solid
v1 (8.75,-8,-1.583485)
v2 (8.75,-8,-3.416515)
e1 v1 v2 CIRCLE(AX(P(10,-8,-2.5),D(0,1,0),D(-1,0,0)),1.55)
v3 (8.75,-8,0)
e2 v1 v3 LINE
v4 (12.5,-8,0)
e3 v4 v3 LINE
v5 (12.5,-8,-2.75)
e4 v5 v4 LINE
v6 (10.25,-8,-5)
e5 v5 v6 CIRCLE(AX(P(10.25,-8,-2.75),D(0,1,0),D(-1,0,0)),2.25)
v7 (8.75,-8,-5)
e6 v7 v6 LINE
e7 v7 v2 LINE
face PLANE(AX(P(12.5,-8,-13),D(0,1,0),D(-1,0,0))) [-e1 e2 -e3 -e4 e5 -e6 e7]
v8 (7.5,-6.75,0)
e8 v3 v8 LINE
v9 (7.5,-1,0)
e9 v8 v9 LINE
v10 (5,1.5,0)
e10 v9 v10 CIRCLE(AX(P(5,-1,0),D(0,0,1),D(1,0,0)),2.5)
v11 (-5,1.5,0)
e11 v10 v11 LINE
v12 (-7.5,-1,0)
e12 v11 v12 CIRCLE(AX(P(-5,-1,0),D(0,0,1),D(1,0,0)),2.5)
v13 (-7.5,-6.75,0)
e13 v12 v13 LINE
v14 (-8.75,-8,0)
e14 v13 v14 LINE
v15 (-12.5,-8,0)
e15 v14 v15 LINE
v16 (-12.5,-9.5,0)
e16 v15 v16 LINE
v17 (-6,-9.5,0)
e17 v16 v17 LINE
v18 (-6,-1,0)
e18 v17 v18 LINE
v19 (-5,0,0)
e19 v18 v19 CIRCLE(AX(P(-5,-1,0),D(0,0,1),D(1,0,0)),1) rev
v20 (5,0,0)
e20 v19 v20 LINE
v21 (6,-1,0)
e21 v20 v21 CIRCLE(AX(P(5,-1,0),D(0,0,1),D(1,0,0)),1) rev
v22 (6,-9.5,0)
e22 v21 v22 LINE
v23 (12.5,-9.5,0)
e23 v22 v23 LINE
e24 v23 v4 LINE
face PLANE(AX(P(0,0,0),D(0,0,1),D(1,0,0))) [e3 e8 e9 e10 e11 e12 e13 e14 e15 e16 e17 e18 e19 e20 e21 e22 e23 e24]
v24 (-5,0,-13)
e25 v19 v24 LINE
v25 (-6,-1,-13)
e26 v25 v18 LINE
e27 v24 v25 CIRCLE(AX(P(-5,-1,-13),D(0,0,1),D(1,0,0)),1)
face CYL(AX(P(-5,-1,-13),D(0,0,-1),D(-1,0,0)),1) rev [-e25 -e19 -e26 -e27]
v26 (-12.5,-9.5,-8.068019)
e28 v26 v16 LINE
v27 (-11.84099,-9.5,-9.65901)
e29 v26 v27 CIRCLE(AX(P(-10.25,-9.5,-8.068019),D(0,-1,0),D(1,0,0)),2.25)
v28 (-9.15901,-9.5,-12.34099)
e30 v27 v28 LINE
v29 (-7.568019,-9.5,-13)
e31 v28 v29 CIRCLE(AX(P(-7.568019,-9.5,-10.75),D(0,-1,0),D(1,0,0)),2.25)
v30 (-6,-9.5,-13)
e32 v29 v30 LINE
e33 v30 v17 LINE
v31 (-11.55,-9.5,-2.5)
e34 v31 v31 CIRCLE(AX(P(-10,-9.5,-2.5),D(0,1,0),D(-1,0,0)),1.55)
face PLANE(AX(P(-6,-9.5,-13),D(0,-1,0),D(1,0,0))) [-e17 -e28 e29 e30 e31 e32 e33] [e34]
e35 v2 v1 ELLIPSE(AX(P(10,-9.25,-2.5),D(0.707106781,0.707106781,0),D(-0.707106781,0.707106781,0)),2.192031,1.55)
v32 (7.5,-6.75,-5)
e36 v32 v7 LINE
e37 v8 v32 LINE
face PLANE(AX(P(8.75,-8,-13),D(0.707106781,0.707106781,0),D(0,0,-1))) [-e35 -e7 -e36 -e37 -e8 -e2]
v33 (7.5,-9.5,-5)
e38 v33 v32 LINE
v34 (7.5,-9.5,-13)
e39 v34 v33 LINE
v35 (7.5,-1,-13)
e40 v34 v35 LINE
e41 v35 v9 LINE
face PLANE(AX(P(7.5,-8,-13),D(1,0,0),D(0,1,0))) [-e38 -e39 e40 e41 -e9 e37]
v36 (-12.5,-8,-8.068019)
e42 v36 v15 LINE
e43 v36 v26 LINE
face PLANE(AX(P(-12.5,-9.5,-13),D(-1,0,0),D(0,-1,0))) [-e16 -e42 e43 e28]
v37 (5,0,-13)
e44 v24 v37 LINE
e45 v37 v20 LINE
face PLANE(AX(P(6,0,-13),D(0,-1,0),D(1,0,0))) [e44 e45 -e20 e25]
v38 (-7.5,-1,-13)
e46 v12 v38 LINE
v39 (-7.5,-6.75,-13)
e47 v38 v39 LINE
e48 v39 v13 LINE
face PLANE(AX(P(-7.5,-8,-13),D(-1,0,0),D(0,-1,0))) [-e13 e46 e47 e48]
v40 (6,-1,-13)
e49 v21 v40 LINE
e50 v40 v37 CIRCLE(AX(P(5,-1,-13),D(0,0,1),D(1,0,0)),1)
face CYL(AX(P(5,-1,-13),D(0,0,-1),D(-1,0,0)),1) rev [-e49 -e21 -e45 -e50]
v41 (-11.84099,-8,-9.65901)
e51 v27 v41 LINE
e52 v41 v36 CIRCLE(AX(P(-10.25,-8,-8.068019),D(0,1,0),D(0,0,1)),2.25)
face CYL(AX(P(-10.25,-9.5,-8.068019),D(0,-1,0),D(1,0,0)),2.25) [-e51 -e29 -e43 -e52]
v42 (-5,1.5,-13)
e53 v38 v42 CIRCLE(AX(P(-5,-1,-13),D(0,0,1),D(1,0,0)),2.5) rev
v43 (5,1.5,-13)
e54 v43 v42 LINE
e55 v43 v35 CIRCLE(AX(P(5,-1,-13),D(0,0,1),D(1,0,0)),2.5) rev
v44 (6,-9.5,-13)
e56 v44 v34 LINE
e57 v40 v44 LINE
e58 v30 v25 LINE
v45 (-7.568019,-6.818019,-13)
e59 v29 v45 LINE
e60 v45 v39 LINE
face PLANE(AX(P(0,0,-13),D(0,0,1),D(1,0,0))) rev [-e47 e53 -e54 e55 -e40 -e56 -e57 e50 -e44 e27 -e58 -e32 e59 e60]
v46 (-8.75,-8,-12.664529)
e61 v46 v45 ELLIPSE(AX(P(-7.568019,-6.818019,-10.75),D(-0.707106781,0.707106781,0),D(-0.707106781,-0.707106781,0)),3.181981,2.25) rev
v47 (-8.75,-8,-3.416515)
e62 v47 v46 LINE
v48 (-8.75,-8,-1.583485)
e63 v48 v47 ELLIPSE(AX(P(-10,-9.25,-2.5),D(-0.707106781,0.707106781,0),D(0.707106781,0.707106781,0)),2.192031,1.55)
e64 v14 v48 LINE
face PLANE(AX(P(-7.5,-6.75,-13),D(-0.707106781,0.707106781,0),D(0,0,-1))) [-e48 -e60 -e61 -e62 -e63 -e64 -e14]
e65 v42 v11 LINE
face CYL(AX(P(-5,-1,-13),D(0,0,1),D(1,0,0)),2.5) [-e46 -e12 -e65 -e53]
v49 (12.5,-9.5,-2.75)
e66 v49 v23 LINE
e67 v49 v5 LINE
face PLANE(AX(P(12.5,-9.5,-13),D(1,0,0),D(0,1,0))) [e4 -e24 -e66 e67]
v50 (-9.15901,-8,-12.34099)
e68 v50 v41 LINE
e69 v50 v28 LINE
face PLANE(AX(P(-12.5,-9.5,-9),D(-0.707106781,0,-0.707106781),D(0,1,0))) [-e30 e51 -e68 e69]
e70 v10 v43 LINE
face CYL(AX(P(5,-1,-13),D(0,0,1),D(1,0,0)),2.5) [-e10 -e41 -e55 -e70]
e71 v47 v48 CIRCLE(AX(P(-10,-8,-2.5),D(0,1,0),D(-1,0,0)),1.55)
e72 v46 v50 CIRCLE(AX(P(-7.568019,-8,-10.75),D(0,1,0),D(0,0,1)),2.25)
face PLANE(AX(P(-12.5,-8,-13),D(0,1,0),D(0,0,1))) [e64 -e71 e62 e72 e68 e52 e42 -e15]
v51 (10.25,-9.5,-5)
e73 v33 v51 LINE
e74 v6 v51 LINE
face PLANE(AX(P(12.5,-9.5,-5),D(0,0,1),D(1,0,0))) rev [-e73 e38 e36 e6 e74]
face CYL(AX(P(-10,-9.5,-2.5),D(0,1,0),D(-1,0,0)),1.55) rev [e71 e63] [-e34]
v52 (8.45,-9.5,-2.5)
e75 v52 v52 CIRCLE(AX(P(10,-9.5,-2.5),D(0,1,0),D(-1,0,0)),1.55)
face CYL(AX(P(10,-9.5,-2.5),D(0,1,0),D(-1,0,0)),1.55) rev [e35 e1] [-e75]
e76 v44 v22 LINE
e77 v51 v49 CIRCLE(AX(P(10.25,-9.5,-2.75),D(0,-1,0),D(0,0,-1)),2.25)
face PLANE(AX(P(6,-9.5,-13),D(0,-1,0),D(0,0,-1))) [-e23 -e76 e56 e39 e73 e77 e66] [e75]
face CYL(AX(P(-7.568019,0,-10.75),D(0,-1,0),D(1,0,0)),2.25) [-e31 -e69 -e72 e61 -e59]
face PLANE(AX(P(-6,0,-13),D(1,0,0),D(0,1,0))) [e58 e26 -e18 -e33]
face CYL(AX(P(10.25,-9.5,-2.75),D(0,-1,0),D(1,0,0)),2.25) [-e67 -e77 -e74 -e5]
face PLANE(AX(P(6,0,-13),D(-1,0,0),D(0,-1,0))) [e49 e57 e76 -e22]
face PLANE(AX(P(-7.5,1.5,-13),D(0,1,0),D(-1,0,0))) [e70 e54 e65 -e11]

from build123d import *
from build123d.topology import SkipClean

# Parameters (mm, degrees)
BOSS_EXTRUDE1_DEPTH = 13
SKETCH2_W           = 5
SKETCH2_H           = 8
CUT_EXTRUDE1_DEPTH  = 21.383817111
SKETCH3_R           = 1.55
CUT_EXTRUDE2_DEPTH  = 21.383817111
FILLET1_R           = 1
FILLET2_R           = 2.5
CHAMFER1_SIZE       = 4
FILLET3_R           = 2.25
FILLET4_R           = 2.25
CHAMFER2_START      = -13
CHAMFER2_DEPTH      = 13
CHAMFER2_START_2    = -5
CHAMFER2_2_DEPTH    = 5
CHAMFER2_START_3    = -8
CHAMFER2_3_DEPTH    = 1.181980515


with BuildPart() as part:
    # Sketch1 → Boss-Extrude1 (new body)
    with BuildSketch(Plane.XY):
        Polygon((6, 0), (-6, 0), (-6, -9.5), (-12.5, -9.5), (-12.5, -8), (-7.5, -8), (-7.5, 1.5), (7.5, 1.5), (7.5, -8), (12.5, -8), (12.5, -9.5), (6, -9.5), align=None)
    extrude(amount=-BOSS_EXTRUDE1_DEPTH)

    # Sketch2 → Cut-Extrude1 (cut, through all)
    with BuildSketch(Plane(origin=(0, -8, 0), x_dir=(1, 0, 0), z_dir=(0, 1, 0))):
        with Locations((10, 9)):
            Rectangle(SKETCH2_W, SKETCH2_H)
    extrude(amount=-CUT_EXTRUDE1_DEPTH, mode=Mode.SUBTRACT)

    # Sketch3 → Cut-Extrude2 (cut, through all)
    with BuildSketch(Plane(origin=(0, -8, 0), x_dir=(1, 0, 0), z_dir=(0, 1, 0))):
        with Locations(Location((10, 2.5, 0), (0, 0, 180))):
            Circle(SKETCH3_R)
        with Locations(Location((-10, 2.5, 0), (0, 0, 180))):
            Circle(SKETCH3_R)
    extrude(amount=-CUT_EXTRUDE2_DEPTH, mode=Mode.SUBTRACT)

    # Fillet1
    fillet1_edges = [part.edges().sort_by_distance(p)[0] for p in [
        (6, 0, -6.5),
        (-6, 0, -6.5),
    ]]
    fillet(fillet1_edges, radius=FILLET1_R)

    # Fillet2
    fillet2_edges = [part.edges().sort_by_distance(p)[0] for p in [
        (-7.5, 1.5, -6.5),
        (7.5, 1.5, -6.5),
    ]]
    fillet(fillet2_edges, radius=FILLET2_R)

    # Chamfer1
    chamfer1_edges = [part.edges().sort_by_distance(p)[0] for p in [
        (-12.5, -8.75, -13),
    ]]
    chamfer(chamfer1_edges, length=CHAMFER1_SIZE)

    # Fillet3
    fillet3_edges = [part.edges().sort_by_distance(p)[0] for p in [
        (-12.5, -8.75, -9),
        (-8.5, -8.75, -13),
    ]]
    fillet(fillet3_edges, radius=FILLET3_R)

    # Fillet4
    fillet4_edges = [part.edges().sort_by_distance(p)[0] for p in [
        (12.5, -8.75, -5),
    ]]
    fillet(fillet4_edges, radius=FILLET4_R)

    # Chamfer2: read off the stored shape, not the designer's step
    # Chamfer2 outline → Chamfer2 (add)
    with BuildSketch(Plane.XY.offset(CHAMFER2_START)):
        Polygon((-7.5, -8), (-7.5, -6.75), (-8.75, -8), align=None)
    extrude(amount=CHAMFER2_DEPTH)

    # Chamfer2 2 outline → Chamfer2 2 (add)
    with BuildSketch(Plane.XY.offset(CHAMFER2_START_2)):
        Polygon((7.5, -8), (8.75, -8), (7.5, -6.75), align=None)
    extrude(amount=CHAMFER2_2_DEPTH)

    # Chamfer2 3 outline → Chamfer2 3 (cut)
    with SkipClean():  # the faces are left unmerged after this step: merging them gives an invalid solid
        with BuildSketch(Plane(origin=(0, 0, 0), x_dir=(1, 0, 0), z_dir=(0, 1, 0)).offset(CHAMFER2_START_3)):
            with BuildLine():
                Line((8.75, 1.583484861), (8.75, 3.416515139))
                ThreePointArc((8.75, 3.416515139), (8.45, 2.5), (8.75, 1.583484861))
            make_face()
            with BuildLine():
                Line((-7.568019485, 13), (-8.75, 13))
                Line((-8.75, 13), (-8.75, 12.664529201))
                ThreePointArc((-8.75, 12.664529201), (-8.182352171, 12.914508108), (-7.568019485, 13))
            make_face()
            with BuildLine():
                ThreePointArc((-8.75, 1.583484861), (-8.45, 2.5), (-8.75, 3.416515139))
                Line((-8.75, 3.416515139), (-8.75, 1.583484861))
            make_face()
        extrude(amount=CHAMFER2_3_DEPTH, mode=Mode.SUBTRACT)


solid = part.part
